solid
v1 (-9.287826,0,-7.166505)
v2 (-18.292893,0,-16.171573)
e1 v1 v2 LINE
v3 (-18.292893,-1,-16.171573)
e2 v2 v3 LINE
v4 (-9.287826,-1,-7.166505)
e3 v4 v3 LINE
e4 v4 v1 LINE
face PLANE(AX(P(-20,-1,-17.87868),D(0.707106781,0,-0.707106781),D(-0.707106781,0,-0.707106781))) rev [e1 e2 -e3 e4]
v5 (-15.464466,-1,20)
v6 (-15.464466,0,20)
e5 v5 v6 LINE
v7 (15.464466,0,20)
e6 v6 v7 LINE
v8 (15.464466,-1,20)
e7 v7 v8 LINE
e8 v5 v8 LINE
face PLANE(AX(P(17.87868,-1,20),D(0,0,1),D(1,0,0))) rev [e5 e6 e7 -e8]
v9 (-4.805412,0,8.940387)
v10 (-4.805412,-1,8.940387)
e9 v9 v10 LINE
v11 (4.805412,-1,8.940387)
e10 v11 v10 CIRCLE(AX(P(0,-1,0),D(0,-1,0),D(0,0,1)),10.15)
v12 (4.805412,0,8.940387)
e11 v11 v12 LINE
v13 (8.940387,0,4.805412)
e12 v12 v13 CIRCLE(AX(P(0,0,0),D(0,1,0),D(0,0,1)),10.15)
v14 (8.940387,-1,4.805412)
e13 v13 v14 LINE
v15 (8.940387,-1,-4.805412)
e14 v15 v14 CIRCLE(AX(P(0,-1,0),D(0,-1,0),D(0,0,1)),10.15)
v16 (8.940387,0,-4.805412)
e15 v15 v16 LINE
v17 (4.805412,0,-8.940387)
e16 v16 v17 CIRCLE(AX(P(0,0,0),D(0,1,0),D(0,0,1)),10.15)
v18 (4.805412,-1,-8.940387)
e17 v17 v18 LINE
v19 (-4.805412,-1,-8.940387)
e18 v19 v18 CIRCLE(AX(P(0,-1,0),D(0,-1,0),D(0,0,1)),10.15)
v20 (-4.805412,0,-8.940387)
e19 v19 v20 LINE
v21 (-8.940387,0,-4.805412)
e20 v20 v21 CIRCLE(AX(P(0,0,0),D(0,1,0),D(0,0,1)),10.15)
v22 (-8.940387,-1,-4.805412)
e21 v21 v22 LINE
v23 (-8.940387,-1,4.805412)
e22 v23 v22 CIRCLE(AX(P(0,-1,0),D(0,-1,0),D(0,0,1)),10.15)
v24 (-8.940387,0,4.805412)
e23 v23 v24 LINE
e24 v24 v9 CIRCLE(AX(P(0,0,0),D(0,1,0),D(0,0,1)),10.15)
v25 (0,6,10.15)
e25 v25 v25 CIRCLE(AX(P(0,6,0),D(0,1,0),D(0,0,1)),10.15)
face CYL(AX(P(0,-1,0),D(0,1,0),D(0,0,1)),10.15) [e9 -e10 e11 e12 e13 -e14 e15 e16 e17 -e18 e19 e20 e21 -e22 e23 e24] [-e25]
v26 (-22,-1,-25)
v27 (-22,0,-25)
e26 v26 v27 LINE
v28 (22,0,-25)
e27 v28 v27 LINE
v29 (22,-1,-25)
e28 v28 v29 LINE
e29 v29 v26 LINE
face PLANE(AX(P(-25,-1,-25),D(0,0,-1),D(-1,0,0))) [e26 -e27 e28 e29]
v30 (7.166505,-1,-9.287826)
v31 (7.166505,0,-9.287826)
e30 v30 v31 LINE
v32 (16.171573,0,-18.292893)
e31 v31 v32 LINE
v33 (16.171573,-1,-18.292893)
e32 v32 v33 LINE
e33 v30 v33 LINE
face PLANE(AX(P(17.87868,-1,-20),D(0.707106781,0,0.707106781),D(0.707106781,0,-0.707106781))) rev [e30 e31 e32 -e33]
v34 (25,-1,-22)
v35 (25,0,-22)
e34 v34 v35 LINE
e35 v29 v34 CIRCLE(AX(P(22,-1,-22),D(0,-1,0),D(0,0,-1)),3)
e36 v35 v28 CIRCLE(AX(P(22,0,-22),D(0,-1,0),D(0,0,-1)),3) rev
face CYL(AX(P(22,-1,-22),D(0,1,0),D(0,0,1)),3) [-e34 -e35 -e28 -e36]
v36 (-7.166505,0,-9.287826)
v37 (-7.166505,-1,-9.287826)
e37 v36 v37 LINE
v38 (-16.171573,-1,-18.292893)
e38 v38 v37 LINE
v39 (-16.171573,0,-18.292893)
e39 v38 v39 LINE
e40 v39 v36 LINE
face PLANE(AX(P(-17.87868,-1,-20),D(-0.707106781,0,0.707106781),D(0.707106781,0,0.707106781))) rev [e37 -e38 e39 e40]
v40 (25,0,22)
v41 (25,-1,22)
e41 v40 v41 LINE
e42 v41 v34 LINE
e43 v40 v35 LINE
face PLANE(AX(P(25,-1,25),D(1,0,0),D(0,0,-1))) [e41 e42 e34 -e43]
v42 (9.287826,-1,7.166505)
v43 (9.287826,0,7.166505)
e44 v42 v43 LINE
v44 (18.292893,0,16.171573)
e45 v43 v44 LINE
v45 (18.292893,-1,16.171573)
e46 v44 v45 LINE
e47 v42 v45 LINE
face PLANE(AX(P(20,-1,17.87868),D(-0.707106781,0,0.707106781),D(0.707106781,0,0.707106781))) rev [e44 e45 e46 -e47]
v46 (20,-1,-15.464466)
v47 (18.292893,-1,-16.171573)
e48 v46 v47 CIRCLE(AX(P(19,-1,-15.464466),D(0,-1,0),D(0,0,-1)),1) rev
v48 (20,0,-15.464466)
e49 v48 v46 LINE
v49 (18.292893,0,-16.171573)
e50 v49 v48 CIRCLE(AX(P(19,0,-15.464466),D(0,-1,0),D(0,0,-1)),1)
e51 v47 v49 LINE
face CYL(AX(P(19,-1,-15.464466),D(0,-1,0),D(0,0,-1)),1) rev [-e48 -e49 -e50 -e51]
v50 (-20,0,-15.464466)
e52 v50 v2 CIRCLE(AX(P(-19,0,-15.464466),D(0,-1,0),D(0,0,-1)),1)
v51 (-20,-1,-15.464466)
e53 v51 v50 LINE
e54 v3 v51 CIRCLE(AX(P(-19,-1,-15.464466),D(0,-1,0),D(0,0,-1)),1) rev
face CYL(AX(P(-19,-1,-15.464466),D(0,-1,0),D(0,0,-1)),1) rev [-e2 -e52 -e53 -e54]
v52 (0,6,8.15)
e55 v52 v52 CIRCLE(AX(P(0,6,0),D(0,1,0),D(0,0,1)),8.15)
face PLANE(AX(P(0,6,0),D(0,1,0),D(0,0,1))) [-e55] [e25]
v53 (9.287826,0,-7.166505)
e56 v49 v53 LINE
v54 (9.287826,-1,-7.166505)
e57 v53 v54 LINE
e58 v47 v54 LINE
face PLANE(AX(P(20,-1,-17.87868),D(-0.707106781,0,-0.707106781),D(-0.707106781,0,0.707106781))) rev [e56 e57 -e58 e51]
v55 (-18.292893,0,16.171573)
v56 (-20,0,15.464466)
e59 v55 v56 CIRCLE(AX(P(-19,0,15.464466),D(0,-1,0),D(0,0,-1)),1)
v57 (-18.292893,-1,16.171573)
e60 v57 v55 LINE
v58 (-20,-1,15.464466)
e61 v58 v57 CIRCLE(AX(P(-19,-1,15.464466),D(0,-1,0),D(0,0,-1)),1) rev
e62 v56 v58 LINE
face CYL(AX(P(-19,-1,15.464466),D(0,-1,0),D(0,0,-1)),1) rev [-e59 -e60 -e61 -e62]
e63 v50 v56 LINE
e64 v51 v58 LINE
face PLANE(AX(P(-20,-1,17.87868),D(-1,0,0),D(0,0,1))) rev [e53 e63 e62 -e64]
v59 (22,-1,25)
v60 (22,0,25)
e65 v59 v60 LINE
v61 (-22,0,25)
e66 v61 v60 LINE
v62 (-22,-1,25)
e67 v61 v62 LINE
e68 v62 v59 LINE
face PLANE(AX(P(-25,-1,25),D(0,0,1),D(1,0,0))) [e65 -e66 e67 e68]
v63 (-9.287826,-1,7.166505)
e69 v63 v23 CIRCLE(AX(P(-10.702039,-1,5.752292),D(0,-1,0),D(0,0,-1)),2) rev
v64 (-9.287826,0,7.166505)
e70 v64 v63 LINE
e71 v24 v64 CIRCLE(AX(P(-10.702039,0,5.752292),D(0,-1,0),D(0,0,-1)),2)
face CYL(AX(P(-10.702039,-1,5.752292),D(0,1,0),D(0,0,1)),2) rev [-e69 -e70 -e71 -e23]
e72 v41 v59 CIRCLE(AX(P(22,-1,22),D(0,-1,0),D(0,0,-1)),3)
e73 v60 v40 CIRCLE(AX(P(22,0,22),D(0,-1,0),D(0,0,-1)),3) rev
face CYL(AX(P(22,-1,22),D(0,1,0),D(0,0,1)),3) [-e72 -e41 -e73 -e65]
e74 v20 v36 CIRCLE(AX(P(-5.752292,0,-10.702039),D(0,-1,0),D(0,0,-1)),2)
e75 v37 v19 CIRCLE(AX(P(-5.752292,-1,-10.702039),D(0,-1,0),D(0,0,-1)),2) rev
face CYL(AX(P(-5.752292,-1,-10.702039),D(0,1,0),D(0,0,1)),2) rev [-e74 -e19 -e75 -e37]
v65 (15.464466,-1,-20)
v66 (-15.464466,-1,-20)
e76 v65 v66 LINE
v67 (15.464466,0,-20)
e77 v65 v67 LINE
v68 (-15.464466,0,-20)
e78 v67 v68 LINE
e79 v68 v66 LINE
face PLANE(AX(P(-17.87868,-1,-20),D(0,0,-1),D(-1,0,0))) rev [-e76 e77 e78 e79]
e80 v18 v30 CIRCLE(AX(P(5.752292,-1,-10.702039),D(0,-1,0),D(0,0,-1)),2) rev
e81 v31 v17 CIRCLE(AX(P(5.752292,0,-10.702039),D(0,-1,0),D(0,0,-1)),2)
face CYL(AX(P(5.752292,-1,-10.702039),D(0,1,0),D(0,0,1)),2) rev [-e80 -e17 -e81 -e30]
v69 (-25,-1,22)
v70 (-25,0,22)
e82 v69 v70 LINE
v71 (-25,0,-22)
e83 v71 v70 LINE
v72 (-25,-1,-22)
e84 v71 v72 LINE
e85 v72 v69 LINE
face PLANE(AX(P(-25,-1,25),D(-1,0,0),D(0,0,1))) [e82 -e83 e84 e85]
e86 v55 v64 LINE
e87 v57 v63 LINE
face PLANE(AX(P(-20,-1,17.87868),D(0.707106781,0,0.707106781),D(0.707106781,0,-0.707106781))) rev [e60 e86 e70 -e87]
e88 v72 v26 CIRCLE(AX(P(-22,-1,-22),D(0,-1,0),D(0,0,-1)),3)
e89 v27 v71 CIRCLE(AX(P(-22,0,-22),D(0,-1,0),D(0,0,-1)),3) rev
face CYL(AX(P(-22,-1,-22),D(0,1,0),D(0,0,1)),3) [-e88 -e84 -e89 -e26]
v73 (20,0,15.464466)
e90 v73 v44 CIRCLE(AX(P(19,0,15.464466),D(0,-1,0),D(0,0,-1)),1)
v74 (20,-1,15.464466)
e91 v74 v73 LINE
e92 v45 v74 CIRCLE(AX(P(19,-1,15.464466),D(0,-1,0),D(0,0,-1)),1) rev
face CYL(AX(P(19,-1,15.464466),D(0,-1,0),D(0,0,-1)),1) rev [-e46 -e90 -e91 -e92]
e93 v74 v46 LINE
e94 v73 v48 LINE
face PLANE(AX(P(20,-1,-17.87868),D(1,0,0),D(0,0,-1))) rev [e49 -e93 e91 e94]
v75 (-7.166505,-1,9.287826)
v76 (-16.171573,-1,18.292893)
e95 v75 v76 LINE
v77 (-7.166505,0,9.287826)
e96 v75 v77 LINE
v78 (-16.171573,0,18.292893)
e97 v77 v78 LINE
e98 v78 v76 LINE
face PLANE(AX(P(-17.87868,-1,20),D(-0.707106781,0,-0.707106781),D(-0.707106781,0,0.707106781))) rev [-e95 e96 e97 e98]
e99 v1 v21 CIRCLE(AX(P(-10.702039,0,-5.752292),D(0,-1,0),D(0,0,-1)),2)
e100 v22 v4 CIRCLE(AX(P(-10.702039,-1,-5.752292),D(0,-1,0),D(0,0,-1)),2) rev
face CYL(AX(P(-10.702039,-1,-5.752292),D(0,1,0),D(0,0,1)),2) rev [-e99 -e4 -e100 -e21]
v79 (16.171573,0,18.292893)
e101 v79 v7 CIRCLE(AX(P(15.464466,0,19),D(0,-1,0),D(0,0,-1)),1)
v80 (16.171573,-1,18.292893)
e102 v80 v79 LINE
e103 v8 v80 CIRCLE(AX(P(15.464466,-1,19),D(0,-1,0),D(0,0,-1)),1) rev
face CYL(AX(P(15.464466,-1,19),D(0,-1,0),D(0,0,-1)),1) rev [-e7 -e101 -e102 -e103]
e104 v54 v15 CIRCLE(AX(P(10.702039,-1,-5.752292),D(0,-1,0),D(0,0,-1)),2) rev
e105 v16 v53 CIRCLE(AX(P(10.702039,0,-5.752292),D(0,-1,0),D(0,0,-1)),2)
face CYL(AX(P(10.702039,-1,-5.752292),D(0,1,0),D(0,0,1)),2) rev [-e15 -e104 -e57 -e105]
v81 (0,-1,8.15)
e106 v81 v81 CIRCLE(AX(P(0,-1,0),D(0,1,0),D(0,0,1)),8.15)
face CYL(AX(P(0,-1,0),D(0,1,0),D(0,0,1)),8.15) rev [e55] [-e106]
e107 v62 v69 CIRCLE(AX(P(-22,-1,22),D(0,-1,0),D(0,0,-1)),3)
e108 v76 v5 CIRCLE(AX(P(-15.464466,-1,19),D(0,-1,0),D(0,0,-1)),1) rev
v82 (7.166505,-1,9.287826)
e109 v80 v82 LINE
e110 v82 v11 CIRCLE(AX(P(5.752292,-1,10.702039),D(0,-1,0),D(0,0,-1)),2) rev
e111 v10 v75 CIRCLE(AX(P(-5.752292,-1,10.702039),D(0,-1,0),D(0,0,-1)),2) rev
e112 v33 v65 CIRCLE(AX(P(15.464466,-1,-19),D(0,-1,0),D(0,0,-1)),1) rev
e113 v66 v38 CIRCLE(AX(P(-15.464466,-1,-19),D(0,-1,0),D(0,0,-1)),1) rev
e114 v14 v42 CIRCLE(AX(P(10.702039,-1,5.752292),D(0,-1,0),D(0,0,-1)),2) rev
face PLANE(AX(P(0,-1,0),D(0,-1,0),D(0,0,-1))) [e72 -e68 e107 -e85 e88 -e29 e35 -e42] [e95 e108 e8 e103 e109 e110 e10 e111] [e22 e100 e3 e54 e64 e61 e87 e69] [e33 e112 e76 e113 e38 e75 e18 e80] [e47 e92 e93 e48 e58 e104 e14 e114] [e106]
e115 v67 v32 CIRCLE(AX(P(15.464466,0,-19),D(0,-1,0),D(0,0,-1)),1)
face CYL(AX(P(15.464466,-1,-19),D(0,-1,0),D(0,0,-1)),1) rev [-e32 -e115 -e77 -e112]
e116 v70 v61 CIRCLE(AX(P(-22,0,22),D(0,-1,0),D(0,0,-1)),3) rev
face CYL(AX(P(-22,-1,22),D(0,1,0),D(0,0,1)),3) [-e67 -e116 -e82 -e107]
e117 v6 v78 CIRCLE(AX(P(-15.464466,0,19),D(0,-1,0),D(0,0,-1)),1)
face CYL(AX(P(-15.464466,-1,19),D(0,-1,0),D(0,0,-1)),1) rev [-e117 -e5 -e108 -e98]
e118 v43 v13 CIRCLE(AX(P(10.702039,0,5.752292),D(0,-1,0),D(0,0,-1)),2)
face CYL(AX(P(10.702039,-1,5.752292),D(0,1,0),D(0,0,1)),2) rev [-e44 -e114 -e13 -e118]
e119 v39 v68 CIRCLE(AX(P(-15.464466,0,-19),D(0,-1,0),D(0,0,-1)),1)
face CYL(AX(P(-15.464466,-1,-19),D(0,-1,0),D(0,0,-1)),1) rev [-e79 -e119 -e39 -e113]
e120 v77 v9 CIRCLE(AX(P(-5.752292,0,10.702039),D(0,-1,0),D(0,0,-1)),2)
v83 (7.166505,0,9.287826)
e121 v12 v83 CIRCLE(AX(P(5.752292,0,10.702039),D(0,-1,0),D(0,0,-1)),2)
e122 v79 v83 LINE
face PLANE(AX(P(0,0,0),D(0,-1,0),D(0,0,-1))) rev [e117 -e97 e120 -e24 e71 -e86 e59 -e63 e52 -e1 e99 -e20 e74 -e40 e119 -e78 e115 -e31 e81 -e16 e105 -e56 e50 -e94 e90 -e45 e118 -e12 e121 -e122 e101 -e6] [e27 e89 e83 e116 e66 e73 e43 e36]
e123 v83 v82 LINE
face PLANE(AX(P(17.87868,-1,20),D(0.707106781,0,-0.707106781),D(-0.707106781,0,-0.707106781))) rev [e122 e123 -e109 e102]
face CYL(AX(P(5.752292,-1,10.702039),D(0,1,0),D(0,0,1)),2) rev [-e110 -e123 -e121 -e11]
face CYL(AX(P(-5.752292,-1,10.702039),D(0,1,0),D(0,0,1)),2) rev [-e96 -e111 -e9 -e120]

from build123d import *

# Parameters (mm, degrees)
SKETCH1_W           = 50
SKETCH1_H           = 50
SKETCH1_R           = 8.15
BASE_FLANGE1_DEPTH  = 1
FILLET1_R           = 3
FILLET2_R           = 1
FILLET3_R           = 2
BOSS_EXTRUDE1_START = 6
SKETCH2_R           = 10.15
SKETCH2_R_2         = 8.15
BOSS_EXTRUDE1_DEPTH = 6


# Sheet-metal steps are written as plain solids
with BuildPart() as part:
    # Sketch1 → Base-Flange1 (new body)
    with BuildSketch(Plane(origin=(0, 0, 0), x_dir=(1, 0, 0), z_dir=(0, 1, 0))):
        Rectangle(SKETCH1_W, SKETCH1_H)
        with Locations(Location((0, 0, 0), (0, 0, 270))):
            Circle(SKETCH1_R, mode=Mode.SUBTRACT)
        with BuildLine():
            Line((20, 17.878679656), (20, -17.878679656))
            Line((20, -17.878679656), (8.15898744, -6.037667096))
            ThreePointArc((8.15898744, -6.037667096), (10.15, 0), (8.15898744, 6.037667096))
            Line((8.15898744, 6.037667096), (20, 17.878679656))
        make_face(mode=Mode.SUBTRACT)
        with BuildLine():
            Line((17.878679656, -20), (-17.878679656, -20))
            Line((-17.878679656, -20), (-6.037667096, -8.15898744))
            ThreePointArc((-6.037667096, -8.15898744), (0, -10.15), (6.037667096, -8.15898744))
            Line((6.037667096, -8.15898744), (17.878679656, -20))
        make_face(mode=Mode.SUBTRACT)
        with BuildLine():
            Line((-20, -17.878679656), (-20, 17.878679656))
            Line((-20, 17.878679656), (-8.15898744, 6.037667096))
            ThreePointArc((-8.15898744, 6.037667096), (-10.15, 0), (-8.15898744, -6.037667096))
            Line((-8.15898744, -6.037667096), (-20, -17.878679656))
        make_face(mode=Mode.SUBTRACT)
        with BuildLine():
            Line((-17.878679656, 20), (17.878679656, 20))
            Line((17.878679656, 20), (6.037667096, 8.15898744))
            ThreePointArc((6.037667096, 8.15898744), (0, 10.15), (-6.037667096, 8.15898744))
            Line((-6.037667096, 8.15898744), (-17.878679656, 20))
        make_face(mode=Mode.SUBTRACT)
    extrude(amount=-BASE_FLANGE1_DEPTH)

    # Fillet1
    fillet1_edges = [part.edges().sort_by_distance(p)[0] for p in [
        (25, -0.5, 25),
        (-25, -0.5, 25),
        (-25, -0.5, -25),
        (25, -0.5, -25),
    ]]
    fillet(fillet1_edges, radius=FILLET1_R)

    # Fillet2
    fillet2_edges = [part.edges().sort_by_distance(p)[0] for p in [
        (17.878679656, -0.5, 20),
        (-17.878679656, -0.5, 20),
        (20, -0.5, -17.878679656),
        (20, -0.5, 17.878679656),
        (17.878679656, -0.5, -20),
        (-17.878679656, -0.5, -20),
        (-20, -0.5, -17.878679656),
        (-20, -0.5, 17.878679656),
    ]]
    fillet(fillet2_edges, radius=FILLET2_R)

    # Fillet3
    fillet3_edges = [part.edges().sort_by_distance(p)[0] for p in [
        (-6.037667096, -0.5, 8.15898744),
        (6.037667096, -0.5, 8.15898744),
        (8.15898744, -0.5, -6.037667096),
        (8.15898744, -0.5, 6.037667096),
        (6.037667096, -0.5, -8.15898744),
        (-6.037667096, -0.5, -8.15898744),
        (-8.15898744, -0.5, -6.037667096),
        (-8.15898744, -0.5, 6.037667096),
    ]]
    fillet(fillet3_edges, radius=FILLET3_R)

    # Sketch2 → Boss-Extrude1 (add)
    with BuildSketch(Plane(origin=(0, 0, 0), x_dir=(1, 0, 0), z_dir=(0, 1, 0)).offset(BOSS_EXTRUDE1_START)):
        with Locations(Location((0, 0, 0), (0, 0, 270))):
            Circle(SKETCH2_R)
        with Locations(Location((0, 0, 0), (0, 0, 270))):
            Circle(SKETCH2_R_2, mode=Mode.SUBTRACT)
    extrude(amount=-BOSS_EXTRUDE1_DEPTH)


solid = part.part
